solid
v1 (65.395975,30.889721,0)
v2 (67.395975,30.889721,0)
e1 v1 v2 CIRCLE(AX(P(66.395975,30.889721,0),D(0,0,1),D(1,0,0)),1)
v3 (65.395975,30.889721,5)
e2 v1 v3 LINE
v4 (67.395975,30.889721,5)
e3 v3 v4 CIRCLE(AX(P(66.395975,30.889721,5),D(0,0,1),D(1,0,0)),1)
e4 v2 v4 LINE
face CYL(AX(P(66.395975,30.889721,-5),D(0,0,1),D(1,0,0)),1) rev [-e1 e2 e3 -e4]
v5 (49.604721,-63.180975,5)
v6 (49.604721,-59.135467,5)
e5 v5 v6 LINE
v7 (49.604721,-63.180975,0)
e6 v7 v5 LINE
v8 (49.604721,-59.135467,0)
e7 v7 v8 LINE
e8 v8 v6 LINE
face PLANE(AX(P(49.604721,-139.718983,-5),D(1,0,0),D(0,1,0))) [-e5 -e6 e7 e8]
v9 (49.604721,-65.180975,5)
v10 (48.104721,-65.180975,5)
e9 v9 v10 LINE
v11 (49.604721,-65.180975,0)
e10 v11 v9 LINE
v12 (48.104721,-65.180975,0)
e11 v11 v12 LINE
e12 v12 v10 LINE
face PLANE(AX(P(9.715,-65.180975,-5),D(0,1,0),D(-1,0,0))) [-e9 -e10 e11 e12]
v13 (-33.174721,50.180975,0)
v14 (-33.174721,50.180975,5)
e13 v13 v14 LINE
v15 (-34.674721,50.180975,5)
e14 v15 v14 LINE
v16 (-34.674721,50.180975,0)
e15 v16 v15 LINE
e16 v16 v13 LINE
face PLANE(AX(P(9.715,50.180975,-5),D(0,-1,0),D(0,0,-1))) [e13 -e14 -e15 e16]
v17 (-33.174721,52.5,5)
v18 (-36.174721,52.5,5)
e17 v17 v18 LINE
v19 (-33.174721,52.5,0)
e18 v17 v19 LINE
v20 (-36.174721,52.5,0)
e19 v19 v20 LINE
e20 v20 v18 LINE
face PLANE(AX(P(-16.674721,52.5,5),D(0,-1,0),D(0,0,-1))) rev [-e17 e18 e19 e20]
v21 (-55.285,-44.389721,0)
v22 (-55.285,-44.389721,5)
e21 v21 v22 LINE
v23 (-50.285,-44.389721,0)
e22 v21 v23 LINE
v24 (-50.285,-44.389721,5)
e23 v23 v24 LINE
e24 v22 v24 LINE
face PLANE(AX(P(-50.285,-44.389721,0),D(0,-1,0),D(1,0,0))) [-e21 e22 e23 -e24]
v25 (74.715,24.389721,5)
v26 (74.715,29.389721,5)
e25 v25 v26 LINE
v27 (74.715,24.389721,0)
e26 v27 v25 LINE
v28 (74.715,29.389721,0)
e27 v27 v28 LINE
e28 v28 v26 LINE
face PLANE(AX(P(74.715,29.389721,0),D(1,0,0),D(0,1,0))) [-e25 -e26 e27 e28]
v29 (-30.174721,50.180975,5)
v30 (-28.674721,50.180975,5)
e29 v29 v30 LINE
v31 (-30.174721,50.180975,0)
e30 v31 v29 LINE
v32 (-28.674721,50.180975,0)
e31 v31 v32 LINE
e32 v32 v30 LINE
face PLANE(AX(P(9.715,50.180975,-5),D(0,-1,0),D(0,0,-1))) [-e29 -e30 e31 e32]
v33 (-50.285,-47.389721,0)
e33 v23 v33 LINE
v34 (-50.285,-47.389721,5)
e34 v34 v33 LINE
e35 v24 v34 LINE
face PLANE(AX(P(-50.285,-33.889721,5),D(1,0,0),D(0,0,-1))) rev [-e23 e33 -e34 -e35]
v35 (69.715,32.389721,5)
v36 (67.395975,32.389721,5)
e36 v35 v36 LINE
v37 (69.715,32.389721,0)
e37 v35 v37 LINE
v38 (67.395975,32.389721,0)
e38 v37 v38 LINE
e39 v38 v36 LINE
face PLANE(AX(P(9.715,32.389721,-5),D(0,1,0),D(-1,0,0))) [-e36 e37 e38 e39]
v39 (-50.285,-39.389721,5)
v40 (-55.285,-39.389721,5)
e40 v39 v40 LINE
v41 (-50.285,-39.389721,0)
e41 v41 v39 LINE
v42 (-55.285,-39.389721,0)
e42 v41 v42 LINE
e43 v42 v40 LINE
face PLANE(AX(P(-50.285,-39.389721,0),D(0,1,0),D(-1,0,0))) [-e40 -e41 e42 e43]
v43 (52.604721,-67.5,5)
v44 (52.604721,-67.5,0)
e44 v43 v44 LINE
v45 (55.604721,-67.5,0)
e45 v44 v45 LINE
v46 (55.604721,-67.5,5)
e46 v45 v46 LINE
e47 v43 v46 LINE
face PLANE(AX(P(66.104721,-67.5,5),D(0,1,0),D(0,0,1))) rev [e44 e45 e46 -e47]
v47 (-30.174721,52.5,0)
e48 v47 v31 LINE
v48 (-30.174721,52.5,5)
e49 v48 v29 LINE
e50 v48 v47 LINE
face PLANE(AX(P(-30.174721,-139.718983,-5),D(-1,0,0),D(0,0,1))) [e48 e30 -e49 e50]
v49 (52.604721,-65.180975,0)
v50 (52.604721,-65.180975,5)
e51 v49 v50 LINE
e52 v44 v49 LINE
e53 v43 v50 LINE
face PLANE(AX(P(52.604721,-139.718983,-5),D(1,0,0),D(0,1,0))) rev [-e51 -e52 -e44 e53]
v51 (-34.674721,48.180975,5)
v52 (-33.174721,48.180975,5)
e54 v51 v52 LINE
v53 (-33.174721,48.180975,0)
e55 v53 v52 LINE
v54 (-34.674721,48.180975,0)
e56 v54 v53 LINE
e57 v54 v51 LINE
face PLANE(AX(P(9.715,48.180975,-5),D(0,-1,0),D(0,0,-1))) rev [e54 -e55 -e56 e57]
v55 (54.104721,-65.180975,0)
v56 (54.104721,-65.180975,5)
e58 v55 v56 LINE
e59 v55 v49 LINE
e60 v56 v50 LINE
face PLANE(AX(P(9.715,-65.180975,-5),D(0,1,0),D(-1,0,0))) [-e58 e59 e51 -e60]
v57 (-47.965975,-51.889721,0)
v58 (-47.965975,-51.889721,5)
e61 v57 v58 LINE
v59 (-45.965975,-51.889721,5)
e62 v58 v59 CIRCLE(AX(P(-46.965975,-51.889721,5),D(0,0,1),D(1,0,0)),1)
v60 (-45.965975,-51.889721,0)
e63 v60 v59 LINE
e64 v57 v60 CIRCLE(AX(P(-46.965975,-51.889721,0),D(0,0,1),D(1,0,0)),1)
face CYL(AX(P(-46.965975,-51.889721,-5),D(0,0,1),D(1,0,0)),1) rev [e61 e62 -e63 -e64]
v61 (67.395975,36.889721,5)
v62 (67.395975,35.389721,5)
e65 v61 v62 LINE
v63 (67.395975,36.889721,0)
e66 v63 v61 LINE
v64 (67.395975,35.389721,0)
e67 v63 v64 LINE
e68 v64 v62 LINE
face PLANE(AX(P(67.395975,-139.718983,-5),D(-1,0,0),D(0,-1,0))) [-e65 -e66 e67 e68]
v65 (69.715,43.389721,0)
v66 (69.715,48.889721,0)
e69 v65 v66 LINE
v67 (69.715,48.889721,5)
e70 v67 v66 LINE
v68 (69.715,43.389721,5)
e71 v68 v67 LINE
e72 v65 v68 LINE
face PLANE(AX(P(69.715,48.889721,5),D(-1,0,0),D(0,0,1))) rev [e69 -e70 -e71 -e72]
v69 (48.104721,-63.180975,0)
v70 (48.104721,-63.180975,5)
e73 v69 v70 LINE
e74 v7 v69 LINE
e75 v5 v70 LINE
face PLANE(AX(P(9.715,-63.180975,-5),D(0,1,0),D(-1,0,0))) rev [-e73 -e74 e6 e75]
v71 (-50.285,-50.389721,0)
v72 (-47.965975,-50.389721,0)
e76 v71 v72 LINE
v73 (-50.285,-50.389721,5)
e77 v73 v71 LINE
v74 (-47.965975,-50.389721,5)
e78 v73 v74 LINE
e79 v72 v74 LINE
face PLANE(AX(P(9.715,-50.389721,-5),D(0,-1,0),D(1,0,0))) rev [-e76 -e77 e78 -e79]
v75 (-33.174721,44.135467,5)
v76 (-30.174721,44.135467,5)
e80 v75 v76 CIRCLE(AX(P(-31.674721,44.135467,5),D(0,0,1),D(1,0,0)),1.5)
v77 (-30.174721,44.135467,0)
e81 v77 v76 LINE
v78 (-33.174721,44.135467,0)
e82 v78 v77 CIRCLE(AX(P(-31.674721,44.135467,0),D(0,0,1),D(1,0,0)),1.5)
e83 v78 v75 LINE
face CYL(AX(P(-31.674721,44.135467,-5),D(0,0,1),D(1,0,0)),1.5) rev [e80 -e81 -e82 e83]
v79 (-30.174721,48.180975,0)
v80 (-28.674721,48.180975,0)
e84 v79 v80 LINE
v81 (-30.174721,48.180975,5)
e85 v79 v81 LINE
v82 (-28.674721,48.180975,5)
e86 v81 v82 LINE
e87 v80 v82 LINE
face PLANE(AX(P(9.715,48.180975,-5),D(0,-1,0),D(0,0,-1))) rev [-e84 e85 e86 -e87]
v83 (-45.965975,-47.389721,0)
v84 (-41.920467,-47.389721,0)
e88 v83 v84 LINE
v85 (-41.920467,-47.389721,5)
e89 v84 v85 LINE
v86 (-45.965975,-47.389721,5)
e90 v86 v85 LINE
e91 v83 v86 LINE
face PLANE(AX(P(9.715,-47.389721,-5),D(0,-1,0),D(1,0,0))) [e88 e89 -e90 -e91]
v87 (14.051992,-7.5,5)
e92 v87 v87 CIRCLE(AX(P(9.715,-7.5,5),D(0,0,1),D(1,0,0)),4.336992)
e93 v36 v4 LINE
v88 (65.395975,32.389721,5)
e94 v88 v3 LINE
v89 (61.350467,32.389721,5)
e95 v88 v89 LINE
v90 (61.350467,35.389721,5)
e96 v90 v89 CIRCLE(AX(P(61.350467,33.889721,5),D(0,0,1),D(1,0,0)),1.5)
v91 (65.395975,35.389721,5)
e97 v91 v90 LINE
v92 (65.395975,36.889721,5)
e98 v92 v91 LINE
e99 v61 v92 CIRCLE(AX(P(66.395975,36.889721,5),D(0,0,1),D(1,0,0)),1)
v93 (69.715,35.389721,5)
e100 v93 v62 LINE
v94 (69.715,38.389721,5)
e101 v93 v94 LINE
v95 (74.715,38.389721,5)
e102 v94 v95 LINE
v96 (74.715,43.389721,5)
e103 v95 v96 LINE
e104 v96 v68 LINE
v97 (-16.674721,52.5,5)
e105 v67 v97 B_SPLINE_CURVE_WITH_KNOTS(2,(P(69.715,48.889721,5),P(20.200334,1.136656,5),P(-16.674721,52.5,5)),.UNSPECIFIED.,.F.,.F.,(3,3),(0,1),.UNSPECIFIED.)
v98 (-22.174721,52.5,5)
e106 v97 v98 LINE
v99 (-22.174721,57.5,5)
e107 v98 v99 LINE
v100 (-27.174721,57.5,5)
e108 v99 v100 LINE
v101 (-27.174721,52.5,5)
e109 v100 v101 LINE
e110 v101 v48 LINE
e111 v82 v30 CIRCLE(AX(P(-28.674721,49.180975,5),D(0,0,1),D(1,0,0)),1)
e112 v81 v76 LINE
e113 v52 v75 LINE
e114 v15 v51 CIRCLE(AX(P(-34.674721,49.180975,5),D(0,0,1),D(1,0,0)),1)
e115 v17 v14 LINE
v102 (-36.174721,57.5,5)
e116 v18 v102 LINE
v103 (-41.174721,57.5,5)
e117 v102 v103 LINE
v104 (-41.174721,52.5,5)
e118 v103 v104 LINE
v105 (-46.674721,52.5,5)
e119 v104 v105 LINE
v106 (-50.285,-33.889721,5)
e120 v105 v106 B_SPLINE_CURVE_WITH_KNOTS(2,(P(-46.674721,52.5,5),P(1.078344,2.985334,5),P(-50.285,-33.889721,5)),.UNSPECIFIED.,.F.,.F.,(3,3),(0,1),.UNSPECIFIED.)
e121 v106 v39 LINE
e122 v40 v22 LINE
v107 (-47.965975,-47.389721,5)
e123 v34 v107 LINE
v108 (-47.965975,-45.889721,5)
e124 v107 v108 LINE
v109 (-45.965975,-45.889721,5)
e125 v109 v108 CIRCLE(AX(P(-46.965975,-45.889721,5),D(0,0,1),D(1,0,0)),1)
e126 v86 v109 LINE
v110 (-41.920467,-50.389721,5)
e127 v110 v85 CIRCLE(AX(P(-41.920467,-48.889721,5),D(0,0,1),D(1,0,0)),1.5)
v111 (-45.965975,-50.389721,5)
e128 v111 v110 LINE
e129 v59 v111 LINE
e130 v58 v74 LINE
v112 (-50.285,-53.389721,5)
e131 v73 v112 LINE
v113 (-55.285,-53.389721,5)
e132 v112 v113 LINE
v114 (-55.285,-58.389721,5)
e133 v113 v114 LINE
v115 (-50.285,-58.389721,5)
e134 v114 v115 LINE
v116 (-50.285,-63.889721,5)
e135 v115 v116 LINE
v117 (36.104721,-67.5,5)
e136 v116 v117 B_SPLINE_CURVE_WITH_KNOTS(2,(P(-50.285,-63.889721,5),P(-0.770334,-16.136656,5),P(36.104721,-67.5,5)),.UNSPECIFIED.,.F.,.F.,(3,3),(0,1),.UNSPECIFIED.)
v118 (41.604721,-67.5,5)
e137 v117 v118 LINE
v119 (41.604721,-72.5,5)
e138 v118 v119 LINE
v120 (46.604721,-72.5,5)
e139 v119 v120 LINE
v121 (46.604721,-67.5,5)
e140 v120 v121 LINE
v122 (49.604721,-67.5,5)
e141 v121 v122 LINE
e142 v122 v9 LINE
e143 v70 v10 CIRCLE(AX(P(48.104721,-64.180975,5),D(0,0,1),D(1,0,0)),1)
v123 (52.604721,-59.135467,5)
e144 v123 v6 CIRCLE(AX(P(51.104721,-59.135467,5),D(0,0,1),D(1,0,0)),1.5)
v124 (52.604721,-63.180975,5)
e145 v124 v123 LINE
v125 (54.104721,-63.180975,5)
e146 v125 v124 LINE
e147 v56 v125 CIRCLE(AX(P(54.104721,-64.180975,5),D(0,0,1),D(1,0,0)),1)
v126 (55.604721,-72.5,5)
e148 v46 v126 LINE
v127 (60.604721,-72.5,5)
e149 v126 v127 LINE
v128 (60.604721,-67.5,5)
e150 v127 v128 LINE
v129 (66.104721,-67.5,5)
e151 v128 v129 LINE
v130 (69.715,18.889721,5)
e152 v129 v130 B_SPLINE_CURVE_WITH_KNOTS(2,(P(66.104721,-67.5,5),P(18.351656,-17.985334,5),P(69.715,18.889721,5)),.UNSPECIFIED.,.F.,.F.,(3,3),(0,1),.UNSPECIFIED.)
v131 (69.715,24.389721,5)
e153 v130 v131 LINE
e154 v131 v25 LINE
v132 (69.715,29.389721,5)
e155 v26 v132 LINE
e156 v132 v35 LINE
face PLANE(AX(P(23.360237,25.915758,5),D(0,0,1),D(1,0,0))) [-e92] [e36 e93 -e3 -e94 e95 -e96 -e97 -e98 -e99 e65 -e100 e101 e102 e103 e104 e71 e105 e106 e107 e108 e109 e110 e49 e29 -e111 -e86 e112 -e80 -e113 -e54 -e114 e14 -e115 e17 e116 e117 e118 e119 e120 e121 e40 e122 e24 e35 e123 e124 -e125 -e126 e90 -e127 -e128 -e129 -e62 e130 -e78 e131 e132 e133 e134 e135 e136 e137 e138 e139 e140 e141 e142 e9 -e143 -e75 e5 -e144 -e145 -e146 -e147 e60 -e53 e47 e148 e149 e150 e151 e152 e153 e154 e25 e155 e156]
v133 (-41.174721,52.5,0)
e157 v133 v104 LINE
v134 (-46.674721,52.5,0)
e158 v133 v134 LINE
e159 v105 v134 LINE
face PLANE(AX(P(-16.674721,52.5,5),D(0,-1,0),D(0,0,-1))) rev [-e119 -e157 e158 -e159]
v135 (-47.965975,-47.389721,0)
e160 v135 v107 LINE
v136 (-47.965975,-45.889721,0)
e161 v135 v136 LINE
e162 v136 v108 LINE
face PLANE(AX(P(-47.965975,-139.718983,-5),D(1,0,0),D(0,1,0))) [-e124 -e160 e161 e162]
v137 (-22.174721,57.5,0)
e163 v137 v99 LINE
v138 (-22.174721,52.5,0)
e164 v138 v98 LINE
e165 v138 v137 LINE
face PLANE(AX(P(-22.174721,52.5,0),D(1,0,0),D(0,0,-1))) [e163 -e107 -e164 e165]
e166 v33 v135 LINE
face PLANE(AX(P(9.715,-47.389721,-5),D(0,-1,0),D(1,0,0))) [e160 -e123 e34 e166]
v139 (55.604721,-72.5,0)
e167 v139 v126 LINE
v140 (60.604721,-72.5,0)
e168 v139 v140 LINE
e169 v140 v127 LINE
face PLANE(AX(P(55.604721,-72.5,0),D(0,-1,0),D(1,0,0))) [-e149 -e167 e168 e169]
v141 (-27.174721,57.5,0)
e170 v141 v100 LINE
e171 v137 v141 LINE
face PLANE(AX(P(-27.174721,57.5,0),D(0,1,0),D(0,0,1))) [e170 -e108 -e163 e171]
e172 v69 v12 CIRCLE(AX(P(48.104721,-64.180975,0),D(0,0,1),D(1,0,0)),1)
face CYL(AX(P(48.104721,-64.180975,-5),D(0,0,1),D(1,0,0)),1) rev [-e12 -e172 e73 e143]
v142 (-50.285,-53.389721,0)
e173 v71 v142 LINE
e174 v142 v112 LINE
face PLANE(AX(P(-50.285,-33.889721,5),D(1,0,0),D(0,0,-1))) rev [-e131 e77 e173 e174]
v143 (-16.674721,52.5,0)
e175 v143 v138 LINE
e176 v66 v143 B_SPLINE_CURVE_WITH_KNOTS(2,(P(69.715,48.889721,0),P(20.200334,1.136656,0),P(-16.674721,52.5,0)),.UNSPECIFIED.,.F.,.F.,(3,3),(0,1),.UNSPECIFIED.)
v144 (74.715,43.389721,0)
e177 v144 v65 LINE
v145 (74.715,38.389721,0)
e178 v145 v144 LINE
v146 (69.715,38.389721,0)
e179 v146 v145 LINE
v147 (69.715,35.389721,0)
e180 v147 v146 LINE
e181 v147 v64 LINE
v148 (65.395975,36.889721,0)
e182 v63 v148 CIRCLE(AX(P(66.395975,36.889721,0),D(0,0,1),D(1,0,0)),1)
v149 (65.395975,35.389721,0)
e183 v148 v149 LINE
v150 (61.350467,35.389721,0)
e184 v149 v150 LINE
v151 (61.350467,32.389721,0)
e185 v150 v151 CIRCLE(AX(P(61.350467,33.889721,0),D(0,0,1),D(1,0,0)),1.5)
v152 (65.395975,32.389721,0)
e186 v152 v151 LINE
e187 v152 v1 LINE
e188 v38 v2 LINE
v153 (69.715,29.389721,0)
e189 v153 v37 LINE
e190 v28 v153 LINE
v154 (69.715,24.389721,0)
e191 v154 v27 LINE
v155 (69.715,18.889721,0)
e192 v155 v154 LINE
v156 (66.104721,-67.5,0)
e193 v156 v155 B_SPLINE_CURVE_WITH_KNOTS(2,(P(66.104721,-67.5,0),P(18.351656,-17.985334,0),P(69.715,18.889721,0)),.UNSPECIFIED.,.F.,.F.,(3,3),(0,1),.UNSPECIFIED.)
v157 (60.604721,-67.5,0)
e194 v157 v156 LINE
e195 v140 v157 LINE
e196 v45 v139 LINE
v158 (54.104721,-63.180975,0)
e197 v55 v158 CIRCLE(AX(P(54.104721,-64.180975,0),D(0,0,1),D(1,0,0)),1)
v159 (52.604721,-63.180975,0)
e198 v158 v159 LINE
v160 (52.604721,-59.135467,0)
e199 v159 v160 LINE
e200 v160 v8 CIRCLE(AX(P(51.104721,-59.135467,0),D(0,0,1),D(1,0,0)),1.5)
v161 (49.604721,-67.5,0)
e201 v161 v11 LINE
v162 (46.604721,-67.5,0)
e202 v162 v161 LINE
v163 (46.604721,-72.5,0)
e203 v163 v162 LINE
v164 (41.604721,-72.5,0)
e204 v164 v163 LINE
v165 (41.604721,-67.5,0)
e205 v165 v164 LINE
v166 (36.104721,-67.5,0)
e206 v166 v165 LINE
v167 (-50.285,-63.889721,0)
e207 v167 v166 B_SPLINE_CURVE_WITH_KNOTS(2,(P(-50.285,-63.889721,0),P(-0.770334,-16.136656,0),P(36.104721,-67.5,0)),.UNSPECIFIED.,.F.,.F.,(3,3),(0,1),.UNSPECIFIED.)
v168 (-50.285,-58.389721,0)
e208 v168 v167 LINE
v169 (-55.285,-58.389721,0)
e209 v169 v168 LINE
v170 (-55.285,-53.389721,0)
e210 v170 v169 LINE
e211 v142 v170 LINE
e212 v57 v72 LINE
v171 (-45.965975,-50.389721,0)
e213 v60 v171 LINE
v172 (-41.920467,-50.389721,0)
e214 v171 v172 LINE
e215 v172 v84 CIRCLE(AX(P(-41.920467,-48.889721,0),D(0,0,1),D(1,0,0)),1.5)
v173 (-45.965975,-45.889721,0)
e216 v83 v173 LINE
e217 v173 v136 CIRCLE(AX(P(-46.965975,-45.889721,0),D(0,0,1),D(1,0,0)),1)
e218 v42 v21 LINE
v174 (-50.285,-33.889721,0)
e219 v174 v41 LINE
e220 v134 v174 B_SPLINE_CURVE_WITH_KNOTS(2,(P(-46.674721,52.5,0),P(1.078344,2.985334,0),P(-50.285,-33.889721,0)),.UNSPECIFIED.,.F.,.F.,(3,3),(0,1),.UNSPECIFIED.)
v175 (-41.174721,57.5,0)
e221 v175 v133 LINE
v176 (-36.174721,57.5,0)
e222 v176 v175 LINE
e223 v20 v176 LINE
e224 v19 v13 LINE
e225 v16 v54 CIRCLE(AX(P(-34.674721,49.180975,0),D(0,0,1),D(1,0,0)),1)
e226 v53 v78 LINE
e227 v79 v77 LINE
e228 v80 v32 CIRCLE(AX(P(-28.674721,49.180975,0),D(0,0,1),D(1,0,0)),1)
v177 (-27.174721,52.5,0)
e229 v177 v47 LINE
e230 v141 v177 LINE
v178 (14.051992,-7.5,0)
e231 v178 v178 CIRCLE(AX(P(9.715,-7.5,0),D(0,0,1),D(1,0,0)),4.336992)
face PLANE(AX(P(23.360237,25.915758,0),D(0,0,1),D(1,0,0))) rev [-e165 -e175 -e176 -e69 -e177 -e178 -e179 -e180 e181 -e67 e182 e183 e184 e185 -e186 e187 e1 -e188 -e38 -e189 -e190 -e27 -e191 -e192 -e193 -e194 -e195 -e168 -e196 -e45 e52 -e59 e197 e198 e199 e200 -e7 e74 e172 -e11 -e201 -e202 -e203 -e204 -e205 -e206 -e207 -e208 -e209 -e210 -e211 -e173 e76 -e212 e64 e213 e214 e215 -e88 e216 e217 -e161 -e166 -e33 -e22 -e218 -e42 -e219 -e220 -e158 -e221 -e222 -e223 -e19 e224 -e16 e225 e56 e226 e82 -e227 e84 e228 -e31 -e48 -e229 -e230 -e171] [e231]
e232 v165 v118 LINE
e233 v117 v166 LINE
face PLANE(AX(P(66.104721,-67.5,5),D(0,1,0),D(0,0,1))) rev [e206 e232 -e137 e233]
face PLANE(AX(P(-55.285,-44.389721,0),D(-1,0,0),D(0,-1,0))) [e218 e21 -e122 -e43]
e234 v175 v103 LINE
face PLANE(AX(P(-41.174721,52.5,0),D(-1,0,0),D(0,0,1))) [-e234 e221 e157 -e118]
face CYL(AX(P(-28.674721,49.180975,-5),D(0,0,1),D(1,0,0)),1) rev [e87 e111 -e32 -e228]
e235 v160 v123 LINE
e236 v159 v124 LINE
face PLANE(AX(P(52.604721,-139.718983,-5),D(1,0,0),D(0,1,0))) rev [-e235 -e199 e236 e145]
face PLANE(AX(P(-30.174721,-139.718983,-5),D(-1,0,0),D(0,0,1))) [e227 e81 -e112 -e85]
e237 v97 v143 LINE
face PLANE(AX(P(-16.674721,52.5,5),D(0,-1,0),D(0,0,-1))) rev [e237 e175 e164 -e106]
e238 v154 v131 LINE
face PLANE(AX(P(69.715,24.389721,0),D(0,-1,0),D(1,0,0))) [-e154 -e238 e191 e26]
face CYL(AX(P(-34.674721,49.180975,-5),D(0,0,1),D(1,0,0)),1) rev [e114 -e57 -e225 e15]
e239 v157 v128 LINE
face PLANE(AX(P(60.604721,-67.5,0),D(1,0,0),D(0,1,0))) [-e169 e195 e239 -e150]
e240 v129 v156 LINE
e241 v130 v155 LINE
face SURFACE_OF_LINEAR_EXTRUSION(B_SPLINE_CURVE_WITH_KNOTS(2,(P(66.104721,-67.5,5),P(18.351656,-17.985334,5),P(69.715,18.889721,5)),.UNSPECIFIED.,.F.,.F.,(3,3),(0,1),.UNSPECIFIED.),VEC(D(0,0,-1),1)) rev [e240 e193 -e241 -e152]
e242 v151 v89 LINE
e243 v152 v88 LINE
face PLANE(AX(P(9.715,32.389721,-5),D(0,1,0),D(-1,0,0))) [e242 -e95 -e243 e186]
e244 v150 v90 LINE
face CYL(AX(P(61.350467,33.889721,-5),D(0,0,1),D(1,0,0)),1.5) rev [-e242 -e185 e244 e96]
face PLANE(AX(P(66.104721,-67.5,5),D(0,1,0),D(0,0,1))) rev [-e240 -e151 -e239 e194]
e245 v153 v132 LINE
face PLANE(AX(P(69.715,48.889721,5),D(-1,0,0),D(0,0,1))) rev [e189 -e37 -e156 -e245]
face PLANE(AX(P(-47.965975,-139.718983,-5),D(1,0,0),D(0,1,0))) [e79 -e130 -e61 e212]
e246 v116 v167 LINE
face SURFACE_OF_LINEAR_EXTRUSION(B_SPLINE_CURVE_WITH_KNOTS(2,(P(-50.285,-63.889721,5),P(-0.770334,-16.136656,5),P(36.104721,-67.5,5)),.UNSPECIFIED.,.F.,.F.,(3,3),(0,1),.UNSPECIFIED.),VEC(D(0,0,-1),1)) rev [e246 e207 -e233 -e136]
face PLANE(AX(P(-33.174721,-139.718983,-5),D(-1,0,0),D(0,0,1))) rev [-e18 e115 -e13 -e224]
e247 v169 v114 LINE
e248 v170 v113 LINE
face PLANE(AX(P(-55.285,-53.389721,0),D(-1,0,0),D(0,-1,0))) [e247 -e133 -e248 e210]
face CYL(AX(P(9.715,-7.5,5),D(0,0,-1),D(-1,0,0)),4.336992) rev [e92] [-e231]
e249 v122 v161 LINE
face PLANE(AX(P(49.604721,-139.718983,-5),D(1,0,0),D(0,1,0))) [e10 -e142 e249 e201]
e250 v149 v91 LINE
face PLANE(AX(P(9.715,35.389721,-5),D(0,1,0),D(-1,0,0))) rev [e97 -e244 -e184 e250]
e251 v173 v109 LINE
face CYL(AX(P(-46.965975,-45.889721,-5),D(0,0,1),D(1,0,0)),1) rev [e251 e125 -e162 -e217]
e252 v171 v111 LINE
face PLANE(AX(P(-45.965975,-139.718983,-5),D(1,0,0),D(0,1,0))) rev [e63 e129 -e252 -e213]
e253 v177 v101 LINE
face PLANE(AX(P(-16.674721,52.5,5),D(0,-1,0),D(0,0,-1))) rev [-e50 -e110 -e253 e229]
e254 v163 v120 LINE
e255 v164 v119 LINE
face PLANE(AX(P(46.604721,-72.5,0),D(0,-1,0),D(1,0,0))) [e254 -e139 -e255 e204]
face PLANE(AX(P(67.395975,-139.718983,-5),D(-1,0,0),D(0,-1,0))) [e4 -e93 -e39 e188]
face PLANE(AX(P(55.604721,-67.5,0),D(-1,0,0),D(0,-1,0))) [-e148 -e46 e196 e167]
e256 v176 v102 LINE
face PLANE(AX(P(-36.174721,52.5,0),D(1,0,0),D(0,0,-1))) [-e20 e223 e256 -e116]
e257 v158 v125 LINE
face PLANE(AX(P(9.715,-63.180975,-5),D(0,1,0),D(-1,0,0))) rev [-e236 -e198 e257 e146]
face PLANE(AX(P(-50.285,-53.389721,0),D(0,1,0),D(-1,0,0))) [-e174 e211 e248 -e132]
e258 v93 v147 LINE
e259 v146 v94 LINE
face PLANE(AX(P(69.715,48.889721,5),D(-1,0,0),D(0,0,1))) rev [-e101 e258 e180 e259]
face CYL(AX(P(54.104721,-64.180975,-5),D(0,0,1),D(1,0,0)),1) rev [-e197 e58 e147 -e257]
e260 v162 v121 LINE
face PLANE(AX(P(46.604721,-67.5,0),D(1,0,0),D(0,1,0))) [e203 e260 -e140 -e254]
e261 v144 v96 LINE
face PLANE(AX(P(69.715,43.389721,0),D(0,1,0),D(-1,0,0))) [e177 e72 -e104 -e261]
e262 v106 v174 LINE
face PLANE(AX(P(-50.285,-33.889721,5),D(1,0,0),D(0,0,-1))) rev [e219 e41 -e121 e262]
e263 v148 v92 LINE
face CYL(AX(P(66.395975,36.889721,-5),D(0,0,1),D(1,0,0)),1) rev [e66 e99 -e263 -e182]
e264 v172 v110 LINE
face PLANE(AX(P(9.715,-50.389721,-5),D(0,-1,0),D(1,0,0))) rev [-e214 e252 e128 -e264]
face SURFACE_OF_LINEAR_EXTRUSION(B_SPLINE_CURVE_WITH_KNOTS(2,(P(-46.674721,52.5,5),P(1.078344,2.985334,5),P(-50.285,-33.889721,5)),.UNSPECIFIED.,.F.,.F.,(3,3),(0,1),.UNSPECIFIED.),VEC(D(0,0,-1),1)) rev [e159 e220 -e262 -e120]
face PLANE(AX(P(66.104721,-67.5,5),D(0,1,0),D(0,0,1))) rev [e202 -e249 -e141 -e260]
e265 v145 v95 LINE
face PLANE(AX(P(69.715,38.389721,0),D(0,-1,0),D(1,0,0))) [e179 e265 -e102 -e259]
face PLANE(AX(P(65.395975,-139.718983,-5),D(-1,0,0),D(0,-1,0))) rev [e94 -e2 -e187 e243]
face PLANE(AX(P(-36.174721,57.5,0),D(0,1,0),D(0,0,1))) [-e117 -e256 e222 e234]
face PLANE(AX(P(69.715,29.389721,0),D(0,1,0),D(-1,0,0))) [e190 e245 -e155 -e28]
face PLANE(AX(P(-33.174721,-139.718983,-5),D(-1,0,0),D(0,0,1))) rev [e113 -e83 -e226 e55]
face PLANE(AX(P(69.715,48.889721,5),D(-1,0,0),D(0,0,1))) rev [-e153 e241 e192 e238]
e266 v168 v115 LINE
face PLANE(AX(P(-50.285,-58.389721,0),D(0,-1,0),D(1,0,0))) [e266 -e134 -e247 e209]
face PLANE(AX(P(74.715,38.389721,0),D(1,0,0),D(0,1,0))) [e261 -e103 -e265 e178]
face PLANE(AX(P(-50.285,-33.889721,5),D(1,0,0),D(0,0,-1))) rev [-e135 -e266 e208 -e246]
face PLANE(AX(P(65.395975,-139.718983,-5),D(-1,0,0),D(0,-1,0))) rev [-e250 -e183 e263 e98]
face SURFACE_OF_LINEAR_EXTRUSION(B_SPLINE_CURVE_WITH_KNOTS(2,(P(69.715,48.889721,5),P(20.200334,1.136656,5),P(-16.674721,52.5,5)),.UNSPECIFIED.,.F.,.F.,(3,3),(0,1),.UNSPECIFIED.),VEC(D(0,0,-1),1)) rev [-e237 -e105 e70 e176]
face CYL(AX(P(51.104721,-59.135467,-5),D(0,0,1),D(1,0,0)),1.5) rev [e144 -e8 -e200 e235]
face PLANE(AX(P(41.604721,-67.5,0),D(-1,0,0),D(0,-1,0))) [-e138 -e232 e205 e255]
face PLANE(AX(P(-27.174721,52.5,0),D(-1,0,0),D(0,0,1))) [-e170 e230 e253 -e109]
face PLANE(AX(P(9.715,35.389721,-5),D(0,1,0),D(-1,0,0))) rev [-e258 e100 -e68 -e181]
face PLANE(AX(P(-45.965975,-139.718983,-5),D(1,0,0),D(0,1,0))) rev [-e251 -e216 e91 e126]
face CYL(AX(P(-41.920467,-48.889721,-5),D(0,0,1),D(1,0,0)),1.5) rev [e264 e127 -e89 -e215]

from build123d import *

# Parameters (mm, degrees)
SKETCH1_R           = 4.336992443
BOSS_EXTRUDE1_DEPTH = 5
SKETCH2_OUTSIDE_W   = 155.956
SKETCH2_OUTSIDE_H   = 155.956
CUT_EXTRUDE1_DEPTH  = 10
SKETCH3_W           = 5
SKETCH3_H           = 5
BOSS_EXTRUDE2_DEPTH = 5


with BuildPart() as part:
    # Sketch1 → Boss-Extrude1 (new body)
    with BuildSketch(Plane.XY):
        with BuildLine():
            Line((-16.674721166, 52.5), (-46.674721166, 52.5))
            add(Edge.make_bspline(
                [(-46.674721166, 52.5), (1.078343639, 2.985334424), (-50.285, -33.889721166)],
                knots=[0, 0, 0, 1, 1, 1], degree=2))
            Line((-50.285, -33.889721166), (-50.285, -63.889721166))
            add(Edge.make_bspline(
                [(-50.285, -63.889721166), (-0.770334424, -16.136656361), (36.104721166, -67.5)],
                knots=[0, 0, 0, 1, 1, 1], degree=2))
            Line((36.104721166, -67.5), (66.104721166, -67.5))
            add(Edge.make_bspline(
                [(66.104721166, -67.5), (18.351656361, -17.985334424), (69.715, 18.889721166)],
                knots=[0, 0, 0, 1, 1, 1], degree=2))
            Line((69.715, 18.889721166), (69.715, 48.889721166))
            add(Edge.make_bspline(
                [(69.715, 48.889721166), (20.200334424, 1.136656361), (-16.674721166, 52.5)],
                knots=[0, 0, 0, 1, 1, 1], degree=2))
        make_face()
        with Locations((9.715, -7.5)):
            Circle(SKETCH1_R, mode=Mode.SUBTRACT)
    extrude(amount=BOSS_EXTRUDE1_DEPTH)

    # Sketch2 outside → Cut-Extrude1 (cut)
    with BuildSketch(Plane.XY.offset(5)):
        with Locations((9.715, -7.5)):
            Rectangle(SKETCH2_OUTSIDE_W, SKETCH2_OUTSIDE_H)
        with BuildLine():
            Line((-33.174721166, 50.180974538), (-33.174721166, 52.5))
            Line((-33.174721166, 52.500000001), (-46.674721166, 52.5))
            add(Edge.make_bspline(
                [(-46.674721166, 52.5), (1.07834364, 2.985334423), (-50.285000002, -33.889721168)],
                knots=[0, 0, 0, 1, 1, 1], degree=2))
            Line((-50.285000002, -33.889721168), (-50.285000001, -47.389721166))
            Line((-50.285, -47.389721166), (-47.965974538, -47.389721166))
            Line((-47.965974538, -47.389721166), (-47.965974538, -45.889721166))
            ThreePointArc((-47.965974538, -45.889721166), (-46.965974538, -44.889721166), (-45.965974538, -45.889721166))
            Line((-45.965974538, -45.889721166), (-45.965974538, -47.389721166))
            Line((-45.965974538, -47.389721166), (-41.920467471, -47.389721166))
            ThreePointArc((-41.920467471, -47.389721166), (-40.420467471, -48.889721166), (-41.920467471, -50.389721166))
            Line((-41.920467471, -50.389721166), (-45.965974538, -50.389721166))
            Line((-45.965974538, -50.389721166), (-45.965974538, -51.889721166))
            ThreePointArc((-45.965974538, -51.889721166), (-46.965974538, -52.889721166), (-47.965974538, -51.889721166))
            Line((-47.965974538, -51.889721166), (-47.965974538, -50.389721166))
            Line((-47.965974538, -50.389721166), (-50.285, -50.389721166))
            Line((-50.285000001, -50.389721166), (-50.285, -63.889721166))
            add(Edge.make_bspline(
                [(-50.285, -63.889721166), (-0.770334423, -16.13665636), (36.104721168, -67.500000002)],
                knots=[0, 0, 0, 1, 1, 1], degree=2))
            Line((36.104721168, -67.500000002), (49.604721166, -67.500000001))
            Line((49.604721166, -67.5), (49.604721166, -65.180974538))
            Line((49.604721166, -65.180974538), (48.104721166, -65.180974538))
            ThreePointArc((48.104721166, -65.180974538), (47.104721166, -64.180974538), (48.104721166, -63.180974538))
            Line((48.104721166, -63.180974538), (49.604721166, -63.180974538))
            Line((49.604721166, -63.180974538), (49.604721166, -59.135467471))
            ThreePointArc((49.604721166, -59.135467471), (51.104721166, -57.635467471), (52.604721166, -59.135467471))
            Line((52.604721166, -59.135467471), (52.604721166, -63.180974538))
            Line((52.604721166, -63.180974538), (54.104721166, -63.180974538))
            ThreePointArc((54.104721166, -63.180974538), (55.104721166, -64.180974538), (54.104721166, -65.180974538))
            Line((54.104721166, -65.180974538), (52.604721166, -65.180974538))
            Line((52.604721166, -65.180974538), (52.604721166, -67.5))
            Line((52.604721166, -67.500000001), (66.104721166, -67.5))
            add(Edge.make_bspline(
                [(66.104721166, -67.5), (18.351656361, -17.985334424), (69.715, 18.889721166)],
                knots=[0, 0, 0, 1, 1, 1], degree=2))
            Line((69.715, 18.889721166), (69.715, 32.389721166))
            Line((69.715, 32.389721166), (67.395974538, 32.389721166))
            Line((67.395974538, 32.389721166), (67.395974538, 30.889721166))
            ThreePointArc((67.395974538, 30.889721166), (66.395974538, 29.889721166), (65.395974538, 30.889721166))
            Line((65.395974538, 30.889721166), (65.395974538, 32.389721166))
            Line((65.395974538, 32.389721166), (61.350467471, 32.389721166))
            ThreePointArc((61.350467471, 32.389721166), (59.850467471, 33.889721166), (61.350467471, 35.389721166))
            Line((61.350467471, 35.389721166), (65.395974538, 35.389721166))
            Line((65.395974538, 35.389721166), (65.395974538, 36.889721166))
            ThreePointArc((65.395974538, 36.889721166), (66.395974538, 37.889721166), (67.395974538, 36.889721166))
            Line((67.395974538, 36.889721166), (67.395974538, 35.389721166))
            Line((67.395974538, 35.389721166), (69.715, 35.389721166))
            Line((69.715, 35.389721166), (69.715, 48.889721166))
            add(Edge.make_bspline(
                [(69.715, 48.889721166), (20.200334423, 1.13665636), (-16.674721168, 52.500000002)],
                knots=[0, 0, 0, 1, 1, 1], degree=2))
            Line((-16.674721168, 52.500000002), (-30.174721166, 52.500000001))
            Line((-30.174721166, 52.5), (-30.174721166, 50.180974538))
            Line((-30.174721166, 50.180974538), (-28.674721166, 50.180974538))
            ThreePointArc((-28.674721166, 50.180974538), (-27.674721166, 49.180974538), (-28.674721166, 48.180974538))
            Line((-28.674721166, 48.180974538), (-30.174721166, 48.180974538))
            Line((-30.174721166, 48.180974538), (-30.174721166, 44.135467471))
            ThreePointArc((-30.174721166, 44.135467471), (-31.674721166, 42.635467471), (-33.174721166, 44.135467471))
            Line((-33.174721166, 44.135467471), (-33.174721166, 48.180974538))
            Line((-33.174721166, 48.180974538), (-34.674721166, 48.180974538))
            ThreePointArc((-34.674721166, 48.180974538), (-35.674721166, 49.180974538), (-34.674721166, 50.180974538))
            Line((-34.674721166, 50.180974538), (-33.174721166, 50.180974538))
        make_face(mode=Mode.SUBTRACT)
    extrude(amount=-CUT_EXTRUDE1_DEPTH, mode=Mode.SUBTRACT)

    # Sketch3 → Boss-Extrude2 (add)
    with BuildSketch(Plane.XY.offset(5)):
        with Locations((-38.674721166, 55)):
            Rectangle(SKETCH3_W, SKETCH3_H)
        with Locations((-24.674721166, 55)):
            Rectangle(SKETCH3_W, SKETCH3_H)
        with Locations((72.215, 40.889721166)):
            Rectangle(SKETCH3_W, SKETCH3_H)
        with Locations((72.215, 26.889721166)):
            Rectangle(SKETCH3_W, SKETCH3_H)
        with Locations((58.104721166, -70)):
            Rectangle(SKETCH3_W, SKETCH3_H)
        with Locations((44.104721166, -70)):
            Rectangle(SKETCH3_W, SKETCH3_H)
        with Locations((-52.785, -55.889721166)):
            Rectangle(SKETCH3_W, SKETCH3_H)
        with Locations((-52.785, -41.889721166)):
            Rectangle(SKETCH3_W, SKETCH3_H)
    extrude(amount=-BOSS_EXTRUDE2_DEPTH)


solid = part.part
